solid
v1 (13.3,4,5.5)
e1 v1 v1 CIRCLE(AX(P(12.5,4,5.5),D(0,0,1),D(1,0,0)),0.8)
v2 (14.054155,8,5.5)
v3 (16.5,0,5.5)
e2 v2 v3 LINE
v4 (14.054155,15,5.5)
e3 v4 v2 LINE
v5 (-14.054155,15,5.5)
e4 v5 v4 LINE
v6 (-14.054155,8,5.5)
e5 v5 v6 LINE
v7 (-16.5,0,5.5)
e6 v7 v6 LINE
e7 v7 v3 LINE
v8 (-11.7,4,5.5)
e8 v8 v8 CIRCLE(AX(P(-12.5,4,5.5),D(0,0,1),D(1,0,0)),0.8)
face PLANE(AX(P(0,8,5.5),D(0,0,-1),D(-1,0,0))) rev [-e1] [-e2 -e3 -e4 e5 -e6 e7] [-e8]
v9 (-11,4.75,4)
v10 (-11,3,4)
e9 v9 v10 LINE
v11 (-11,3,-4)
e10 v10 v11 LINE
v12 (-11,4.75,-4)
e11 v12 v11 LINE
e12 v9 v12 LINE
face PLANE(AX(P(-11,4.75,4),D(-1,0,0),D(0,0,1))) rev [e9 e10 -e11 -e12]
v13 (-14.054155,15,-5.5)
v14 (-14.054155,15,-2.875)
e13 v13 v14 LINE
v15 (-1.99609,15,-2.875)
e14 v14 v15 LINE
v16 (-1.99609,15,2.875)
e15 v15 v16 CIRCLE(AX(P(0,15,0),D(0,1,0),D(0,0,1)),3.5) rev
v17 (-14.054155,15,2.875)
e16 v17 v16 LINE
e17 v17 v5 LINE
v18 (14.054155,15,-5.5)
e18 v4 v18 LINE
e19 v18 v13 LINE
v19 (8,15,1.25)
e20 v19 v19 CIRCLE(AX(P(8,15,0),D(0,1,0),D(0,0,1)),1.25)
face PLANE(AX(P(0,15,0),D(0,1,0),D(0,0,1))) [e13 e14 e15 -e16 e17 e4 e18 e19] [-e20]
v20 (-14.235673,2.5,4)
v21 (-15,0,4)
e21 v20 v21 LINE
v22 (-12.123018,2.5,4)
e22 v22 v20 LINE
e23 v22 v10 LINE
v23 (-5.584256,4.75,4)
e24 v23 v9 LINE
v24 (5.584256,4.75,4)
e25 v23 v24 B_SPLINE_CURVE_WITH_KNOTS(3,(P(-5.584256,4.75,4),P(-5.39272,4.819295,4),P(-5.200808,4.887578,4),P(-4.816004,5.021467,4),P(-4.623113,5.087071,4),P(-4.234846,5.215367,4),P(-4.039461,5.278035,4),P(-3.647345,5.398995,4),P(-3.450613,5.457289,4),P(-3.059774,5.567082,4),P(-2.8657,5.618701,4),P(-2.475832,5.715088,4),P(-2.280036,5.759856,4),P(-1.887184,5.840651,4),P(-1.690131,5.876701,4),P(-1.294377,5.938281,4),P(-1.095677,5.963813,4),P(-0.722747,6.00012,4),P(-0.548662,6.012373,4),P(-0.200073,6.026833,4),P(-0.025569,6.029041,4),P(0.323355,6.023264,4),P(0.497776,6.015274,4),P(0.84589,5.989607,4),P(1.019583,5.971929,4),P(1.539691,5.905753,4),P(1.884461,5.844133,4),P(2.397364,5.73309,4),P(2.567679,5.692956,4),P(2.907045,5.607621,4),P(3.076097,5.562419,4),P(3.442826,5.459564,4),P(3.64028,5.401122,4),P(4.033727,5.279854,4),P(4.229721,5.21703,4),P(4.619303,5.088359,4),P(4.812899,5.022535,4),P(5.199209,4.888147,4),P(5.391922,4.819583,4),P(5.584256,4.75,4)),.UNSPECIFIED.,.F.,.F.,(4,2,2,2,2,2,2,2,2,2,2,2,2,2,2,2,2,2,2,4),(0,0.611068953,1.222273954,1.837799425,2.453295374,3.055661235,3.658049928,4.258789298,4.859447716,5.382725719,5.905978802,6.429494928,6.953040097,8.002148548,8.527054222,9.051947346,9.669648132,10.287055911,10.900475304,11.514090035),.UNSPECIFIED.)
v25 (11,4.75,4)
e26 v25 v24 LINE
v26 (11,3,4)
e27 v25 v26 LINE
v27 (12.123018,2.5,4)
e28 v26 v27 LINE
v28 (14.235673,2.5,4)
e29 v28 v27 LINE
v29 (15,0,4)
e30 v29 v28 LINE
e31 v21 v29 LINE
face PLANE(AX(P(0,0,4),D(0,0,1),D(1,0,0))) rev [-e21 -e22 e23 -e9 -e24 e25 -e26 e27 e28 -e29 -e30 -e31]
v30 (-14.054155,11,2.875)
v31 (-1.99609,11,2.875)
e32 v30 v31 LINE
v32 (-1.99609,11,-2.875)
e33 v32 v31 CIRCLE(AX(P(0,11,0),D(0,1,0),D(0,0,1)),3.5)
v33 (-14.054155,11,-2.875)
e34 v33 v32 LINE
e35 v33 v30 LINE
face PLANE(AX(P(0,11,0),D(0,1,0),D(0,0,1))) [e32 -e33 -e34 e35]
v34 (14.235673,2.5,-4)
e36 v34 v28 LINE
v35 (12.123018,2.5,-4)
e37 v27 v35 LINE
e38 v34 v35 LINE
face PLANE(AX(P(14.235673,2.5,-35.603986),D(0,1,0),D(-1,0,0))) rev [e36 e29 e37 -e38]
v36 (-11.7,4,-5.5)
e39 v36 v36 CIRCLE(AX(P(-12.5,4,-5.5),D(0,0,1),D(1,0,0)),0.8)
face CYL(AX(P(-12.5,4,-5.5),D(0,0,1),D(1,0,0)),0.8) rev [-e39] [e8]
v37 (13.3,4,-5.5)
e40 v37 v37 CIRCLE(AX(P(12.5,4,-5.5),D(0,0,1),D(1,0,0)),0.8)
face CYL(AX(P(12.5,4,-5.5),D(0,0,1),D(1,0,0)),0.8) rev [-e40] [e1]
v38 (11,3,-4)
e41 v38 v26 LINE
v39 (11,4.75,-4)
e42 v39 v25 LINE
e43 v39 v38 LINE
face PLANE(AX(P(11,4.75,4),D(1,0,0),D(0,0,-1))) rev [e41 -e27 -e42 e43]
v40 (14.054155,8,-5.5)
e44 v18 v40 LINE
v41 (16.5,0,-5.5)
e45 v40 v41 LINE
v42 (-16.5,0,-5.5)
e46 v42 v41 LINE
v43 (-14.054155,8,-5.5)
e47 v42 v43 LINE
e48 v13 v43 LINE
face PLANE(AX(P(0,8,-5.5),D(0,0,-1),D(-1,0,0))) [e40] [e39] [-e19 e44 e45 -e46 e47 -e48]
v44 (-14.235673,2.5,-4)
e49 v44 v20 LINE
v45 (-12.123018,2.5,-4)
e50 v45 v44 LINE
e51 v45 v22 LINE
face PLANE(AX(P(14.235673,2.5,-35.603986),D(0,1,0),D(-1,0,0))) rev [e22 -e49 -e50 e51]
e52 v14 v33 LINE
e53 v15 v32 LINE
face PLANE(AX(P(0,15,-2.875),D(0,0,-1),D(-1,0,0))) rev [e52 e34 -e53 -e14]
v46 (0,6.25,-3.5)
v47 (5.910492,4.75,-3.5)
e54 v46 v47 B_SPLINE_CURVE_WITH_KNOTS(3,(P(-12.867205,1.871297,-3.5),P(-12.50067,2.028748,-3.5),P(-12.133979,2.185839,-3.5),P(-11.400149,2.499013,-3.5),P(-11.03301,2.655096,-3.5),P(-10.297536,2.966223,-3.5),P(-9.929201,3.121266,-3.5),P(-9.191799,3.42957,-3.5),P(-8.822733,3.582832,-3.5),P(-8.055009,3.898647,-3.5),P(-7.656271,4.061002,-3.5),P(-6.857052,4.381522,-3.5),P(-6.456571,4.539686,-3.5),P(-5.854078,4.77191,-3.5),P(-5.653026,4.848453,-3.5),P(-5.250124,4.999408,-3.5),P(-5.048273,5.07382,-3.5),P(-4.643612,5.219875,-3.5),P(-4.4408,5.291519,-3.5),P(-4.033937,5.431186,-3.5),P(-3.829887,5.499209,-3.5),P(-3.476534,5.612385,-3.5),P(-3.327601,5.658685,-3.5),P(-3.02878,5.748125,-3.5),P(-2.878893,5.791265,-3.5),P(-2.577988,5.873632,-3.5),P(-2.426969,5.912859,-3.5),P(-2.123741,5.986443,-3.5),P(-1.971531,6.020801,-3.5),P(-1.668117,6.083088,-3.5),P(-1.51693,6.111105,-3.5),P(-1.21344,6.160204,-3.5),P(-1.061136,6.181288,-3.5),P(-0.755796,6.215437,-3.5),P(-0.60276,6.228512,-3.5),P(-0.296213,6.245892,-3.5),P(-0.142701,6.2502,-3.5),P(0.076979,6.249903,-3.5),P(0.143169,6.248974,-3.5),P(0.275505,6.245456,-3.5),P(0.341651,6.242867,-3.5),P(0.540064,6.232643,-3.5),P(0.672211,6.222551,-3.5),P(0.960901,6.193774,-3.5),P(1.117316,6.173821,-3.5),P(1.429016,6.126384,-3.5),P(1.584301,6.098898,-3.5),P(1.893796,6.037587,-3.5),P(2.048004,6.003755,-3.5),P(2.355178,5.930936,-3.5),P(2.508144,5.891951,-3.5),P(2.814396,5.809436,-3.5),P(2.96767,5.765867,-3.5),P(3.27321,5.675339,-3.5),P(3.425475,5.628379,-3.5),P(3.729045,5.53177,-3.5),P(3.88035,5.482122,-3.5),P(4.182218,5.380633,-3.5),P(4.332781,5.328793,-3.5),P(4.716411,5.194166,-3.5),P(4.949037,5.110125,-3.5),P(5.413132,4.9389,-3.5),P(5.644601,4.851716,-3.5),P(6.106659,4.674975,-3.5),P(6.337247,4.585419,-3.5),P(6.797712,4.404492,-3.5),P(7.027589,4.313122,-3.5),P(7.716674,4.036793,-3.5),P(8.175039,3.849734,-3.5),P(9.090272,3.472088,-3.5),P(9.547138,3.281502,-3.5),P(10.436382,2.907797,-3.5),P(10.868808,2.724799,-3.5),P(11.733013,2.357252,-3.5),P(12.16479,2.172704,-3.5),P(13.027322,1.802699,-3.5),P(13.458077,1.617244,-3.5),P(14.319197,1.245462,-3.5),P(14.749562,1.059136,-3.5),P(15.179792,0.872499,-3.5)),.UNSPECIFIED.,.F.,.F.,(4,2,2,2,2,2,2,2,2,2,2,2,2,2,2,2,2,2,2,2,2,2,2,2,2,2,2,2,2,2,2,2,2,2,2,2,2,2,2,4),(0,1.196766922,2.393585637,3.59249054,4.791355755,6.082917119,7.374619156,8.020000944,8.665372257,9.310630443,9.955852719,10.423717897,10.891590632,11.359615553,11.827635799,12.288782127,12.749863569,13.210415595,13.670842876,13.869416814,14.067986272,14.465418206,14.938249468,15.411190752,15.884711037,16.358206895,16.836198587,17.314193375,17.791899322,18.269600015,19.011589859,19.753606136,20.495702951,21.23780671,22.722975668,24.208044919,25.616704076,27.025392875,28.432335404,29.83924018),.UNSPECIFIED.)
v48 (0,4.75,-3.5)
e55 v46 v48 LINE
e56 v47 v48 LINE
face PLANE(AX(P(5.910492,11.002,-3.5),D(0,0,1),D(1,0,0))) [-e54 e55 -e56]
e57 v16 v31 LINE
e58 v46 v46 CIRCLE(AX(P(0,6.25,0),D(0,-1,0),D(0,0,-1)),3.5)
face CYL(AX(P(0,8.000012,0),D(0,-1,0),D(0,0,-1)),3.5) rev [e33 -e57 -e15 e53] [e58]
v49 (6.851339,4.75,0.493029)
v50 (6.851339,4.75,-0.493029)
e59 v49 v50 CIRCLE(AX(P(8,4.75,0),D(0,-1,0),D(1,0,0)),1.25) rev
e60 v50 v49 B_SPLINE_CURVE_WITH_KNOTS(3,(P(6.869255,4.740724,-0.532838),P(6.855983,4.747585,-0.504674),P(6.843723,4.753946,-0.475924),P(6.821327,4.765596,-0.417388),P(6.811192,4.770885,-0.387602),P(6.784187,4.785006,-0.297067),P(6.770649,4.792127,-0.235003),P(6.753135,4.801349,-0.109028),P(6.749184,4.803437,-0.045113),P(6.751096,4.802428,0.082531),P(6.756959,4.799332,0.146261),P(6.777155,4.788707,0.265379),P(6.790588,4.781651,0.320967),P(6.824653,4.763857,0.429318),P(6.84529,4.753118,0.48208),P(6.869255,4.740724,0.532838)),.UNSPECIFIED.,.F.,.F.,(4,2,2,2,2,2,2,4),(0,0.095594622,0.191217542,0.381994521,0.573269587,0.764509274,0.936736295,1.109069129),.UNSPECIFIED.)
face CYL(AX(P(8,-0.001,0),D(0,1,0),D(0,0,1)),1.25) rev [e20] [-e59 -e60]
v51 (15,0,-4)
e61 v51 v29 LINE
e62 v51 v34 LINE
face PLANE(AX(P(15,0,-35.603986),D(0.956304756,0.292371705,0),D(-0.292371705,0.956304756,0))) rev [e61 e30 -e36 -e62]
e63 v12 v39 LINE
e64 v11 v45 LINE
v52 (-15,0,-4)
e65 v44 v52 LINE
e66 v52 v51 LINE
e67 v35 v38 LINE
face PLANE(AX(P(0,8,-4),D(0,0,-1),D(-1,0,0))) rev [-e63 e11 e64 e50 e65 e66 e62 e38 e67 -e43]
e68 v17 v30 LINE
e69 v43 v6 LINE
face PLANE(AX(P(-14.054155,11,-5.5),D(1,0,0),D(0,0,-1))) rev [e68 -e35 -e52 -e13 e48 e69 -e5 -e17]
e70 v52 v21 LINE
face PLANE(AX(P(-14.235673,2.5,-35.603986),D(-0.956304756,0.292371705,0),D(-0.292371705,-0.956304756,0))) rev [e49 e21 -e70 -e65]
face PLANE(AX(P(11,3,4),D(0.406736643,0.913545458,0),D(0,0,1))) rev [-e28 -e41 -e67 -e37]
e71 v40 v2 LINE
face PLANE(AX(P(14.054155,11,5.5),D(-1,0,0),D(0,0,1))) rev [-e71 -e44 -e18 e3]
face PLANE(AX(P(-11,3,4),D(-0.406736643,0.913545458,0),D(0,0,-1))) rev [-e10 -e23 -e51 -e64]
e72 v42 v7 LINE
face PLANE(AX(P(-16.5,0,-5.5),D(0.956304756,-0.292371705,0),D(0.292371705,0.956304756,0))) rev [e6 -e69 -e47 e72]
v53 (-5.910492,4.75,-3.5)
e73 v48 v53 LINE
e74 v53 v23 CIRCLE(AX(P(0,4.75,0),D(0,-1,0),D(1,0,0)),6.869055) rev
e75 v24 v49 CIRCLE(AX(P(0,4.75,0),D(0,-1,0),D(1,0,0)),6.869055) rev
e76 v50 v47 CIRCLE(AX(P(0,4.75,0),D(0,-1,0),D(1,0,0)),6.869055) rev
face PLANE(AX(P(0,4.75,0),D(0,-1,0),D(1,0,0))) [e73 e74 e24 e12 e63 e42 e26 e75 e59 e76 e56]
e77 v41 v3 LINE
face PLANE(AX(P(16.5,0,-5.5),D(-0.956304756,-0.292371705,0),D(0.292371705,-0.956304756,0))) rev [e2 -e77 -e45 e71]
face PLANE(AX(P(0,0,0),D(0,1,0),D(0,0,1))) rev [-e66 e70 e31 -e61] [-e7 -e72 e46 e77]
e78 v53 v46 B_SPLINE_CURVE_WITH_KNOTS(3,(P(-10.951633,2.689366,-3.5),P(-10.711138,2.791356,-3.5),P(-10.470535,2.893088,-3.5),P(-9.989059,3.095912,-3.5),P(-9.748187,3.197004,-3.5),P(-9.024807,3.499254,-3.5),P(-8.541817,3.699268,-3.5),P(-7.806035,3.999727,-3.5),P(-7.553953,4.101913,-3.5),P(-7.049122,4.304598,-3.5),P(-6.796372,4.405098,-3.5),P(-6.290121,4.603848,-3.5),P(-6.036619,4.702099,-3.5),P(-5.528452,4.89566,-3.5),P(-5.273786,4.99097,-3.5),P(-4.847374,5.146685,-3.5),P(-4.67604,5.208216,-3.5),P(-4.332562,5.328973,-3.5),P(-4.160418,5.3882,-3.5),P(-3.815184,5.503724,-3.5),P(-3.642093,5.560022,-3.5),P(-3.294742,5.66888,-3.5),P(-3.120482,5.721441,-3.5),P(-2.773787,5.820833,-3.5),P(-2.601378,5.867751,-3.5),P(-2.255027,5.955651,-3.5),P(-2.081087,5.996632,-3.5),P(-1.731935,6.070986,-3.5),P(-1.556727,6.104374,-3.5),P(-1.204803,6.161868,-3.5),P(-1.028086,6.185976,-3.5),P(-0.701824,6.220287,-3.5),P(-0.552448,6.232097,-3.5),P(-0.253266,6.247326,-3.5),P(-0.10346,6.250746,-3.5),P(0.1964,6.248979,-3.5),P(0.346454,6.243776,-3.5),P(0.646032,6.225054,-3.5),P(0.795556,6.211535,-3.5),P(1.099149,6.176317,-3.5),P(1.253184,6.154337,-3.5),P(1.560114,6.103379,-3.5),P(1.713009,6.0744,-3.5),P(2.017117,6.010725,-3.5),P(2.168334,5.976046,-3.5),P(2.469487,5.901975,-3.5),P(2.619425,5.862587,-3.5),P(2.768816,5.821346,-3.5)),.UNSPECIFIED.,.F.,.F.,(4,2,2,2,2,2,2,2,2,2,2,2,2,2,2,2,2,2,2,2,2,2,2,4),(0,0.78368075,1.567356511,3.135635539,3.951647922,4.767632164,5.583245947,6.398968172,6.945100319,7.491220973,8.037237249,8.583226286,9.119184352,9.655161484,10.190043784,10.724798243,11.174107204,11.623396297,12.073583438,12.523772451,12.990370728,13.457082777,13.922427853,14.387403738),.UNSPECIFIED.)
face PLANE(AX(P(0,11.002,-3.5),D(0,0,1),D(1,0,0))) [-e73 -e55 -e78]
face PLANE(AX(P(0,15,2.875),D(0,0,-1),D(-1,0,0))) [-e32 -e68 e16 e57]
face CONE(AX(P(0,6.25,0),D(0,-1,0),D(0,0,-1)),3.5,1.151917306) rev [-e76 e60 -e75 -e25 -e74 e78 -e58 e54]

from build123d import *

# Parameters (mm, degrees)
SKETCH1_W                      = 33
SKETCH1_H                      = 11
SKETCH1_W_2                    = 30.000000000000036
SKETCH1_H_2                    = 7.99999999999994
BOSS_EXTRUDE1_DEPTH            = 8
SKETCH3_R                      = 0.8000000000000009
CUT_EXTRUDE3_DEPTH             = 22.383404780343106
CUT_EXTRUDE5_REACH             = 21.144
SKETCH5_R                      = 3.5
CUT_EXTRUDE5_DIRECTION_2_DEPTH = 20.144189719076667
CUT_EXTRUDE4_DEPTH             = 22.383404780343106
CUT_EXTRUDE9_START             = -1.5
CUT_EXTRUDE9_DEPTH             = 8
CUT_EXTRUDE8_DEPTH             = 2.25
BOSS_EXTRUDE8_START            = 3
SKETCH12_W                     = 28.108309096661426
SKETCH12_H                     = 11
SKETCH12_R                     = 3.5
BOSS_EXTRUDE8_DEPTH            = 3
CHAMFER1_SIZE                  = 3.369055161
CHAMFER1_SIZE_2                = 1.5
CHAMFER2_SIZE                  = 0.5
CHAMFER2_SIZE2                 = 1.1230183869521158
CHAMFER3_SIZE                  = 0.5
CHAMFER3_SIZE2                 = 1.1230183869521158
BOSS_EXTRUDE9_REACH            = 20.481
BOSS_EXTRUDE10_START           = 4
BOSS_EXTRUDE10_DEPTH           = 4
CUT_EXTRUDE10_REACH            = 24.967
SKETCH20_R                     = 1.2499999999999991


with BuildPart() as part:
    # Sketch1 → Boss-Extrude1 (new body)
    # profile 1 of 2: a face of its own
    with BuildSketch(Plane(origin=(0, 0, 0), x_dir=(1, 0, 0), z_dir=(0, 1, 0))):
        Rectangle(SKETCH1_W, SKETCH1_H)
        Rectangle(SKETCH1_W_2, SKETCH1_H_2, mode=Mode.SUBTRACT)
    # profile 2 of 2: a face of its own
    with BuildSketch(Plane(origin=(0, 0, 0), x_dir=(1, 0, 0), z_dir=(0, 1, 0))):
        Rectangle(SKETCH1_W_2, SKETCH1_H_2)
    extrude(amount=BOSS_EXTRUDE1_DEPTH)

    # Sketch3 → Cut-Extrude3 (cut, through all)
    with BuildSketch(Plane.XY.offset(5.50000000000003)):
        with Locations((-12.500000000000014, 4)):
            Circle(SKETCH3_R)
        with Locations((12.499999999999988, 4)):
            Circle(SKETCH3_R)
    extrude(amount=-CUT_EXTRUDE3_DEPTH, mode=Mode.SUBTRACT)

    # Sketch5 → Cut-Extrude5 (cut, up to next)
    with BuildSketch(Plane(origin=(0, 8, 0), x_dir=(1, 0, 0), z_dir=(0, 1, 0)), mode=Mode.PRIVATE) as cut_extrude5_sk1:
        with Locations(Location((0, 0, 0), (0, 0, 90))):
            Circle(SKETCH5_R)
    cut_extrude5_tool1 = extrude(cut_extrude5_sk1.sketch, amount=-CUT_EXTRUDE5_REACH, mode=Mode.PRIVATE) & part.part
    add(cut_extrude5_tool1.solids().sort_by_distance((0, 8, 0))[0], mode=Mode.SUBTRACT)

    # Sketch5 → Cut-Extrude5 direction 2 (cut)
    with BuildSketch(Plane(origin=(0, 8, 0), x_dir=(1, 0, 0), z_dir=(0, 1, 0))):
        with Locations(Location((0, 0, 0), (0, 0, 90))):
            Circle(SKETCH5_R)
    extrude(amount=CUT_EXTRUDE5_DIRECTION_2_DEPTH, mode=Mode.SUBTRACT)

    # Sketch4 → Cut-Extrude4 (cut, through all)
    with BuildSketch(Plane.XY.offset(5.50000000000003)):
        Polygon((-16.500000000000014, 0), (-14.054154548330727, 8), (-16.500000000000014, 8), align=None)
        Polygon((16.499999999999986, 0), (14.0541545483307, 8), (16.499999999999986, 8), align=None)
    extrude(amount=-CUT_EXTRUDE4_DEPTH, mode=Mode.SUBTRACT)

    # Sketch14 → Cut-Extrude9 (cut)
    with BuildSketch(Plane.XY.offset(5.50000000000003).offset(CUT_EXTRUDE9_START)):
        Polygon((-15.000000000000014, 0), (14.999999999999988, 0), (14.23567329635332, 2.5000000000000067), (-14.235673296353353, 2.500000000000003), align=None)
    extrude(amount=-CUT_EXTRUDE9_DEPTH, mode=Mode.SUBTRACT)

    # Sketch9 → Cut-Extrude8 (cut)
    with BuildSketch(Plane.XZ.offset(-2.500000000000005)):
        Polygon((-11.000000000000002, 4.000000000000002), (11.000000000000002, 4.000000000000001), (11.000000000000004, -3.999999999999999), (-11, -4.000000000000002), align=None)
    extrude(amount=-CUT_EXTRUDE8_DEPTH, mode=Mode.SUBTRACT)

    # Sketch12 → Boss-Extrude8 (add)
    with BuildSketch(Plane(origin=(0, 8, 0), x_dir=(1, 0, 0), z_dir=(0, 1, 0)).offset(BOSS_EXTRUDE8_START)):
        Rectangle(SKETCH12_W, SKETCH12_H)
        with Locations(Location((0, 0, 0), (0, 0, 90))):
            Circle(SKETCH12_R, mode=Mode.SUBTRACT)
    extrude(amount=-BOSS_EXTRUDE8_DEPTH)

    # Chamfer1
    # the kernel refuses this chamfer: 3.369055161, 1.5 mm, written as the material it takes off along each edge
    with BuildSketch(Plane(origin=(0, 4.750000000000005, 0), x_dir=(6e-17, 0, -1), z_dir=(1, 0, 6e-17))) as chamfer1_piece_1_section:
        Polygon((3.5 + CHAMFER1_SIZE, 0), (3.5, CHAMFER1_SIZE_2), (3.5, 0), align=None)
    chamfer1_piece_1 = revolve(axis=Axis((0, 4.750000000000005, 0), (0, 1, 0)), mode=Mode.PRIVATE)
    chamfer1_piece_1 = split(chamfer1_piece_1, bisect_by=Plane(origin=(-5.449382074907194, 4.96599151817854, 4.00000000000003), z_dir=(0, 0, -1)), keep=Keep.TOP, mode=Mode.PRIVATE)
    chamfer1_piece_1 = split(chamfer1_piece_1, bisect_by=Plane(origin=(-5.449382074907194, 4.96599151817854, -3.99999999999997), z_dir=(0, 0, 1)), keep=Keep.TOP, mode=Mode.PRIVATE)
    add(chamfer1_piece_1, mode=Mode.SUBTRACT)

    # Chamfer2
    chamfer2_edges = [part.edges().sort_by_distance(p)[0] for p in [
        (-11, 2.5000000000000036, 0),
    ]]
    chamfer2_side = [part.faces().sort_by_distance(p)[0] for p in [
        (-11.000000000000002, 3.625000000000003, 0),
    ]]
    chamfer(chamfer2_edges, length=CHAMFER2_SIZE, length2=CHAMFER2_SIZE2, reference=chamfer2_side[0])

    # Chamfer3
    chamfer3_edges = [part.edges().sort_by_distance(p)[0] for p in [
        (11.000000000000004, 2.500000000000006, 8.9e-16),
    ]]
    chamfer3_side = [part.faces().sort_by_distance(p)[0] for p in [
        (11.000000000000002, 3.625000000000006, 7.9e-16),
    ]]
    chamfer(chamfer3_edges, length=CHAMFER3_SIZE, length2=CHAMFER3_SIZE2, reference=chamfer3_side[0])

    # Sketch17 → Boss-Extrude9 (add, up to next)
    with BuildSketch(Plane.XZ.offset(-4.750000000000004), mode=Mode.PRIVATE) as boss_extrude9_sk1:
        Polygon((5.910492264007006, -3.500000000000001), (8.9e-16, -3.5), (-5.910492264007006, -3.500000000000001), (-5.910492264007006, -3.999999999999969), (5.910492264007006, -3.999999999999969), align=None)
    boss_extrude9_tool1 = extrude(boss_extrude9_sk1.sketch, amount=-BOSS_EXTRUDE9_REACH, mode=Mode.PRIVATE) - part.part
    add(boss_extrude9_tool1.solids().sort_by_distance((0, 4.75, -3.75))[0])

    # Sketch18 → Boss-Extrude10 (add)
    with BuildSketch(Plane(origin=(0, 11, 0), x_dir=(1, 0, 0), z_dir=(0, 1, 0)).offset(BOSS_EXTRUDE10_START)):
        with BuildLine():
            Line((-1.9960899278338715, -2.875000000000029), (-14.054154548330727, -2.875000000000029))
            Line((-14.054154548330727, -2.875000000000029), (-14.054154548330727, -5.50000000000003))
            Line((-14.054154548330729, -5.50000000000003), (14.0541545483307, -5.50000000000003))
            Line((14.0541545483307, -5.50000000000003), (14.0541545483307, -2.875000000000029))
            Line((14.054154548330702, -2.875000000000029), (1.9960899278337951, -2.875000000000029))
            ThreePointArc((1.996089927833807, -2.8750000000000746), (-3.947e-14, -3.5), (-1.9960899278338722, -2.8750000000000293))
        make_face()
        with BuildLine():
            Line((14.0541545483307, 5.499999999999971), (-14.054154548330729, 5.499999999999971))
            Line((-14.054154548330727, 5.499999999999971), (-14.054154548330727, 2.8749999999999707))
            Line((-14.054154548330727, 2.8749999999999707), (-1.9960899278339532, 2.8749999999999707))
            ThreePointArc((-1.996089927833954, 2.8749999999999725), (-4.946e-14, 3.5), (1.9960899278338722, 2.875000000000029))
            Line((1.9960899278338768, 2.8749999999999702), (14.054154548330702, 2.8749999999999702))
            Line((14.0541545483307, 2.8749999999999702), (14.0541545483307, 5.499999999999971))
        make_face()
        with BuildLine():
            Line((14.0541545483307, -2.875000000000029), (14.0541545483307, 2.87499999999997))
            Line((14.054154548330702, 2.8749999999999702), (1.9960899278338768, 2.8749999999999702))
            ThreePointArc((1.9960899278338722, 2.875000000000029), (3.1013154263488385, 1.6222954805739687), (3.5000000000000004, 0))
            ThreePointArc((3.5000000000000004, 0), (3.10131542634882, -1.622295480574004), (1.996089927833807, -2.8750000000000746))
            Line((1.9960899278337951, -2.875000000000029), (14.054154548330702, -2.875000000000029))
        make_face()
    extrude(amount=-BOSS_EXTRUDE10_DEPTH)

    # Sketch20 → Cut-Extrude10 (cut, up to next)
    with BuildSketch(Plane(origin=(0, 15, 0), x_dir=(1, 0, 0), z_dir=(0, 1, 0)), mode=Mode.PRIVATE) as cut_extrude10_sk1:
        with Locations(Location((8, 0, 0), (0, 0, 270))):
            Circle(SKETCH20_R)
    cut_extrude10_tool1 = extrude(cut_extrude10_sk1.sketch, amount=-CUT_EXTRUDE10_REACH, mode=Mode.PRIVATE) & part.part
    add(cut_extrude10_tool1.solids().sort_by_distance((8, 15, 0))[0], mode=Mode.SUBTRACT)


solid = part.part
